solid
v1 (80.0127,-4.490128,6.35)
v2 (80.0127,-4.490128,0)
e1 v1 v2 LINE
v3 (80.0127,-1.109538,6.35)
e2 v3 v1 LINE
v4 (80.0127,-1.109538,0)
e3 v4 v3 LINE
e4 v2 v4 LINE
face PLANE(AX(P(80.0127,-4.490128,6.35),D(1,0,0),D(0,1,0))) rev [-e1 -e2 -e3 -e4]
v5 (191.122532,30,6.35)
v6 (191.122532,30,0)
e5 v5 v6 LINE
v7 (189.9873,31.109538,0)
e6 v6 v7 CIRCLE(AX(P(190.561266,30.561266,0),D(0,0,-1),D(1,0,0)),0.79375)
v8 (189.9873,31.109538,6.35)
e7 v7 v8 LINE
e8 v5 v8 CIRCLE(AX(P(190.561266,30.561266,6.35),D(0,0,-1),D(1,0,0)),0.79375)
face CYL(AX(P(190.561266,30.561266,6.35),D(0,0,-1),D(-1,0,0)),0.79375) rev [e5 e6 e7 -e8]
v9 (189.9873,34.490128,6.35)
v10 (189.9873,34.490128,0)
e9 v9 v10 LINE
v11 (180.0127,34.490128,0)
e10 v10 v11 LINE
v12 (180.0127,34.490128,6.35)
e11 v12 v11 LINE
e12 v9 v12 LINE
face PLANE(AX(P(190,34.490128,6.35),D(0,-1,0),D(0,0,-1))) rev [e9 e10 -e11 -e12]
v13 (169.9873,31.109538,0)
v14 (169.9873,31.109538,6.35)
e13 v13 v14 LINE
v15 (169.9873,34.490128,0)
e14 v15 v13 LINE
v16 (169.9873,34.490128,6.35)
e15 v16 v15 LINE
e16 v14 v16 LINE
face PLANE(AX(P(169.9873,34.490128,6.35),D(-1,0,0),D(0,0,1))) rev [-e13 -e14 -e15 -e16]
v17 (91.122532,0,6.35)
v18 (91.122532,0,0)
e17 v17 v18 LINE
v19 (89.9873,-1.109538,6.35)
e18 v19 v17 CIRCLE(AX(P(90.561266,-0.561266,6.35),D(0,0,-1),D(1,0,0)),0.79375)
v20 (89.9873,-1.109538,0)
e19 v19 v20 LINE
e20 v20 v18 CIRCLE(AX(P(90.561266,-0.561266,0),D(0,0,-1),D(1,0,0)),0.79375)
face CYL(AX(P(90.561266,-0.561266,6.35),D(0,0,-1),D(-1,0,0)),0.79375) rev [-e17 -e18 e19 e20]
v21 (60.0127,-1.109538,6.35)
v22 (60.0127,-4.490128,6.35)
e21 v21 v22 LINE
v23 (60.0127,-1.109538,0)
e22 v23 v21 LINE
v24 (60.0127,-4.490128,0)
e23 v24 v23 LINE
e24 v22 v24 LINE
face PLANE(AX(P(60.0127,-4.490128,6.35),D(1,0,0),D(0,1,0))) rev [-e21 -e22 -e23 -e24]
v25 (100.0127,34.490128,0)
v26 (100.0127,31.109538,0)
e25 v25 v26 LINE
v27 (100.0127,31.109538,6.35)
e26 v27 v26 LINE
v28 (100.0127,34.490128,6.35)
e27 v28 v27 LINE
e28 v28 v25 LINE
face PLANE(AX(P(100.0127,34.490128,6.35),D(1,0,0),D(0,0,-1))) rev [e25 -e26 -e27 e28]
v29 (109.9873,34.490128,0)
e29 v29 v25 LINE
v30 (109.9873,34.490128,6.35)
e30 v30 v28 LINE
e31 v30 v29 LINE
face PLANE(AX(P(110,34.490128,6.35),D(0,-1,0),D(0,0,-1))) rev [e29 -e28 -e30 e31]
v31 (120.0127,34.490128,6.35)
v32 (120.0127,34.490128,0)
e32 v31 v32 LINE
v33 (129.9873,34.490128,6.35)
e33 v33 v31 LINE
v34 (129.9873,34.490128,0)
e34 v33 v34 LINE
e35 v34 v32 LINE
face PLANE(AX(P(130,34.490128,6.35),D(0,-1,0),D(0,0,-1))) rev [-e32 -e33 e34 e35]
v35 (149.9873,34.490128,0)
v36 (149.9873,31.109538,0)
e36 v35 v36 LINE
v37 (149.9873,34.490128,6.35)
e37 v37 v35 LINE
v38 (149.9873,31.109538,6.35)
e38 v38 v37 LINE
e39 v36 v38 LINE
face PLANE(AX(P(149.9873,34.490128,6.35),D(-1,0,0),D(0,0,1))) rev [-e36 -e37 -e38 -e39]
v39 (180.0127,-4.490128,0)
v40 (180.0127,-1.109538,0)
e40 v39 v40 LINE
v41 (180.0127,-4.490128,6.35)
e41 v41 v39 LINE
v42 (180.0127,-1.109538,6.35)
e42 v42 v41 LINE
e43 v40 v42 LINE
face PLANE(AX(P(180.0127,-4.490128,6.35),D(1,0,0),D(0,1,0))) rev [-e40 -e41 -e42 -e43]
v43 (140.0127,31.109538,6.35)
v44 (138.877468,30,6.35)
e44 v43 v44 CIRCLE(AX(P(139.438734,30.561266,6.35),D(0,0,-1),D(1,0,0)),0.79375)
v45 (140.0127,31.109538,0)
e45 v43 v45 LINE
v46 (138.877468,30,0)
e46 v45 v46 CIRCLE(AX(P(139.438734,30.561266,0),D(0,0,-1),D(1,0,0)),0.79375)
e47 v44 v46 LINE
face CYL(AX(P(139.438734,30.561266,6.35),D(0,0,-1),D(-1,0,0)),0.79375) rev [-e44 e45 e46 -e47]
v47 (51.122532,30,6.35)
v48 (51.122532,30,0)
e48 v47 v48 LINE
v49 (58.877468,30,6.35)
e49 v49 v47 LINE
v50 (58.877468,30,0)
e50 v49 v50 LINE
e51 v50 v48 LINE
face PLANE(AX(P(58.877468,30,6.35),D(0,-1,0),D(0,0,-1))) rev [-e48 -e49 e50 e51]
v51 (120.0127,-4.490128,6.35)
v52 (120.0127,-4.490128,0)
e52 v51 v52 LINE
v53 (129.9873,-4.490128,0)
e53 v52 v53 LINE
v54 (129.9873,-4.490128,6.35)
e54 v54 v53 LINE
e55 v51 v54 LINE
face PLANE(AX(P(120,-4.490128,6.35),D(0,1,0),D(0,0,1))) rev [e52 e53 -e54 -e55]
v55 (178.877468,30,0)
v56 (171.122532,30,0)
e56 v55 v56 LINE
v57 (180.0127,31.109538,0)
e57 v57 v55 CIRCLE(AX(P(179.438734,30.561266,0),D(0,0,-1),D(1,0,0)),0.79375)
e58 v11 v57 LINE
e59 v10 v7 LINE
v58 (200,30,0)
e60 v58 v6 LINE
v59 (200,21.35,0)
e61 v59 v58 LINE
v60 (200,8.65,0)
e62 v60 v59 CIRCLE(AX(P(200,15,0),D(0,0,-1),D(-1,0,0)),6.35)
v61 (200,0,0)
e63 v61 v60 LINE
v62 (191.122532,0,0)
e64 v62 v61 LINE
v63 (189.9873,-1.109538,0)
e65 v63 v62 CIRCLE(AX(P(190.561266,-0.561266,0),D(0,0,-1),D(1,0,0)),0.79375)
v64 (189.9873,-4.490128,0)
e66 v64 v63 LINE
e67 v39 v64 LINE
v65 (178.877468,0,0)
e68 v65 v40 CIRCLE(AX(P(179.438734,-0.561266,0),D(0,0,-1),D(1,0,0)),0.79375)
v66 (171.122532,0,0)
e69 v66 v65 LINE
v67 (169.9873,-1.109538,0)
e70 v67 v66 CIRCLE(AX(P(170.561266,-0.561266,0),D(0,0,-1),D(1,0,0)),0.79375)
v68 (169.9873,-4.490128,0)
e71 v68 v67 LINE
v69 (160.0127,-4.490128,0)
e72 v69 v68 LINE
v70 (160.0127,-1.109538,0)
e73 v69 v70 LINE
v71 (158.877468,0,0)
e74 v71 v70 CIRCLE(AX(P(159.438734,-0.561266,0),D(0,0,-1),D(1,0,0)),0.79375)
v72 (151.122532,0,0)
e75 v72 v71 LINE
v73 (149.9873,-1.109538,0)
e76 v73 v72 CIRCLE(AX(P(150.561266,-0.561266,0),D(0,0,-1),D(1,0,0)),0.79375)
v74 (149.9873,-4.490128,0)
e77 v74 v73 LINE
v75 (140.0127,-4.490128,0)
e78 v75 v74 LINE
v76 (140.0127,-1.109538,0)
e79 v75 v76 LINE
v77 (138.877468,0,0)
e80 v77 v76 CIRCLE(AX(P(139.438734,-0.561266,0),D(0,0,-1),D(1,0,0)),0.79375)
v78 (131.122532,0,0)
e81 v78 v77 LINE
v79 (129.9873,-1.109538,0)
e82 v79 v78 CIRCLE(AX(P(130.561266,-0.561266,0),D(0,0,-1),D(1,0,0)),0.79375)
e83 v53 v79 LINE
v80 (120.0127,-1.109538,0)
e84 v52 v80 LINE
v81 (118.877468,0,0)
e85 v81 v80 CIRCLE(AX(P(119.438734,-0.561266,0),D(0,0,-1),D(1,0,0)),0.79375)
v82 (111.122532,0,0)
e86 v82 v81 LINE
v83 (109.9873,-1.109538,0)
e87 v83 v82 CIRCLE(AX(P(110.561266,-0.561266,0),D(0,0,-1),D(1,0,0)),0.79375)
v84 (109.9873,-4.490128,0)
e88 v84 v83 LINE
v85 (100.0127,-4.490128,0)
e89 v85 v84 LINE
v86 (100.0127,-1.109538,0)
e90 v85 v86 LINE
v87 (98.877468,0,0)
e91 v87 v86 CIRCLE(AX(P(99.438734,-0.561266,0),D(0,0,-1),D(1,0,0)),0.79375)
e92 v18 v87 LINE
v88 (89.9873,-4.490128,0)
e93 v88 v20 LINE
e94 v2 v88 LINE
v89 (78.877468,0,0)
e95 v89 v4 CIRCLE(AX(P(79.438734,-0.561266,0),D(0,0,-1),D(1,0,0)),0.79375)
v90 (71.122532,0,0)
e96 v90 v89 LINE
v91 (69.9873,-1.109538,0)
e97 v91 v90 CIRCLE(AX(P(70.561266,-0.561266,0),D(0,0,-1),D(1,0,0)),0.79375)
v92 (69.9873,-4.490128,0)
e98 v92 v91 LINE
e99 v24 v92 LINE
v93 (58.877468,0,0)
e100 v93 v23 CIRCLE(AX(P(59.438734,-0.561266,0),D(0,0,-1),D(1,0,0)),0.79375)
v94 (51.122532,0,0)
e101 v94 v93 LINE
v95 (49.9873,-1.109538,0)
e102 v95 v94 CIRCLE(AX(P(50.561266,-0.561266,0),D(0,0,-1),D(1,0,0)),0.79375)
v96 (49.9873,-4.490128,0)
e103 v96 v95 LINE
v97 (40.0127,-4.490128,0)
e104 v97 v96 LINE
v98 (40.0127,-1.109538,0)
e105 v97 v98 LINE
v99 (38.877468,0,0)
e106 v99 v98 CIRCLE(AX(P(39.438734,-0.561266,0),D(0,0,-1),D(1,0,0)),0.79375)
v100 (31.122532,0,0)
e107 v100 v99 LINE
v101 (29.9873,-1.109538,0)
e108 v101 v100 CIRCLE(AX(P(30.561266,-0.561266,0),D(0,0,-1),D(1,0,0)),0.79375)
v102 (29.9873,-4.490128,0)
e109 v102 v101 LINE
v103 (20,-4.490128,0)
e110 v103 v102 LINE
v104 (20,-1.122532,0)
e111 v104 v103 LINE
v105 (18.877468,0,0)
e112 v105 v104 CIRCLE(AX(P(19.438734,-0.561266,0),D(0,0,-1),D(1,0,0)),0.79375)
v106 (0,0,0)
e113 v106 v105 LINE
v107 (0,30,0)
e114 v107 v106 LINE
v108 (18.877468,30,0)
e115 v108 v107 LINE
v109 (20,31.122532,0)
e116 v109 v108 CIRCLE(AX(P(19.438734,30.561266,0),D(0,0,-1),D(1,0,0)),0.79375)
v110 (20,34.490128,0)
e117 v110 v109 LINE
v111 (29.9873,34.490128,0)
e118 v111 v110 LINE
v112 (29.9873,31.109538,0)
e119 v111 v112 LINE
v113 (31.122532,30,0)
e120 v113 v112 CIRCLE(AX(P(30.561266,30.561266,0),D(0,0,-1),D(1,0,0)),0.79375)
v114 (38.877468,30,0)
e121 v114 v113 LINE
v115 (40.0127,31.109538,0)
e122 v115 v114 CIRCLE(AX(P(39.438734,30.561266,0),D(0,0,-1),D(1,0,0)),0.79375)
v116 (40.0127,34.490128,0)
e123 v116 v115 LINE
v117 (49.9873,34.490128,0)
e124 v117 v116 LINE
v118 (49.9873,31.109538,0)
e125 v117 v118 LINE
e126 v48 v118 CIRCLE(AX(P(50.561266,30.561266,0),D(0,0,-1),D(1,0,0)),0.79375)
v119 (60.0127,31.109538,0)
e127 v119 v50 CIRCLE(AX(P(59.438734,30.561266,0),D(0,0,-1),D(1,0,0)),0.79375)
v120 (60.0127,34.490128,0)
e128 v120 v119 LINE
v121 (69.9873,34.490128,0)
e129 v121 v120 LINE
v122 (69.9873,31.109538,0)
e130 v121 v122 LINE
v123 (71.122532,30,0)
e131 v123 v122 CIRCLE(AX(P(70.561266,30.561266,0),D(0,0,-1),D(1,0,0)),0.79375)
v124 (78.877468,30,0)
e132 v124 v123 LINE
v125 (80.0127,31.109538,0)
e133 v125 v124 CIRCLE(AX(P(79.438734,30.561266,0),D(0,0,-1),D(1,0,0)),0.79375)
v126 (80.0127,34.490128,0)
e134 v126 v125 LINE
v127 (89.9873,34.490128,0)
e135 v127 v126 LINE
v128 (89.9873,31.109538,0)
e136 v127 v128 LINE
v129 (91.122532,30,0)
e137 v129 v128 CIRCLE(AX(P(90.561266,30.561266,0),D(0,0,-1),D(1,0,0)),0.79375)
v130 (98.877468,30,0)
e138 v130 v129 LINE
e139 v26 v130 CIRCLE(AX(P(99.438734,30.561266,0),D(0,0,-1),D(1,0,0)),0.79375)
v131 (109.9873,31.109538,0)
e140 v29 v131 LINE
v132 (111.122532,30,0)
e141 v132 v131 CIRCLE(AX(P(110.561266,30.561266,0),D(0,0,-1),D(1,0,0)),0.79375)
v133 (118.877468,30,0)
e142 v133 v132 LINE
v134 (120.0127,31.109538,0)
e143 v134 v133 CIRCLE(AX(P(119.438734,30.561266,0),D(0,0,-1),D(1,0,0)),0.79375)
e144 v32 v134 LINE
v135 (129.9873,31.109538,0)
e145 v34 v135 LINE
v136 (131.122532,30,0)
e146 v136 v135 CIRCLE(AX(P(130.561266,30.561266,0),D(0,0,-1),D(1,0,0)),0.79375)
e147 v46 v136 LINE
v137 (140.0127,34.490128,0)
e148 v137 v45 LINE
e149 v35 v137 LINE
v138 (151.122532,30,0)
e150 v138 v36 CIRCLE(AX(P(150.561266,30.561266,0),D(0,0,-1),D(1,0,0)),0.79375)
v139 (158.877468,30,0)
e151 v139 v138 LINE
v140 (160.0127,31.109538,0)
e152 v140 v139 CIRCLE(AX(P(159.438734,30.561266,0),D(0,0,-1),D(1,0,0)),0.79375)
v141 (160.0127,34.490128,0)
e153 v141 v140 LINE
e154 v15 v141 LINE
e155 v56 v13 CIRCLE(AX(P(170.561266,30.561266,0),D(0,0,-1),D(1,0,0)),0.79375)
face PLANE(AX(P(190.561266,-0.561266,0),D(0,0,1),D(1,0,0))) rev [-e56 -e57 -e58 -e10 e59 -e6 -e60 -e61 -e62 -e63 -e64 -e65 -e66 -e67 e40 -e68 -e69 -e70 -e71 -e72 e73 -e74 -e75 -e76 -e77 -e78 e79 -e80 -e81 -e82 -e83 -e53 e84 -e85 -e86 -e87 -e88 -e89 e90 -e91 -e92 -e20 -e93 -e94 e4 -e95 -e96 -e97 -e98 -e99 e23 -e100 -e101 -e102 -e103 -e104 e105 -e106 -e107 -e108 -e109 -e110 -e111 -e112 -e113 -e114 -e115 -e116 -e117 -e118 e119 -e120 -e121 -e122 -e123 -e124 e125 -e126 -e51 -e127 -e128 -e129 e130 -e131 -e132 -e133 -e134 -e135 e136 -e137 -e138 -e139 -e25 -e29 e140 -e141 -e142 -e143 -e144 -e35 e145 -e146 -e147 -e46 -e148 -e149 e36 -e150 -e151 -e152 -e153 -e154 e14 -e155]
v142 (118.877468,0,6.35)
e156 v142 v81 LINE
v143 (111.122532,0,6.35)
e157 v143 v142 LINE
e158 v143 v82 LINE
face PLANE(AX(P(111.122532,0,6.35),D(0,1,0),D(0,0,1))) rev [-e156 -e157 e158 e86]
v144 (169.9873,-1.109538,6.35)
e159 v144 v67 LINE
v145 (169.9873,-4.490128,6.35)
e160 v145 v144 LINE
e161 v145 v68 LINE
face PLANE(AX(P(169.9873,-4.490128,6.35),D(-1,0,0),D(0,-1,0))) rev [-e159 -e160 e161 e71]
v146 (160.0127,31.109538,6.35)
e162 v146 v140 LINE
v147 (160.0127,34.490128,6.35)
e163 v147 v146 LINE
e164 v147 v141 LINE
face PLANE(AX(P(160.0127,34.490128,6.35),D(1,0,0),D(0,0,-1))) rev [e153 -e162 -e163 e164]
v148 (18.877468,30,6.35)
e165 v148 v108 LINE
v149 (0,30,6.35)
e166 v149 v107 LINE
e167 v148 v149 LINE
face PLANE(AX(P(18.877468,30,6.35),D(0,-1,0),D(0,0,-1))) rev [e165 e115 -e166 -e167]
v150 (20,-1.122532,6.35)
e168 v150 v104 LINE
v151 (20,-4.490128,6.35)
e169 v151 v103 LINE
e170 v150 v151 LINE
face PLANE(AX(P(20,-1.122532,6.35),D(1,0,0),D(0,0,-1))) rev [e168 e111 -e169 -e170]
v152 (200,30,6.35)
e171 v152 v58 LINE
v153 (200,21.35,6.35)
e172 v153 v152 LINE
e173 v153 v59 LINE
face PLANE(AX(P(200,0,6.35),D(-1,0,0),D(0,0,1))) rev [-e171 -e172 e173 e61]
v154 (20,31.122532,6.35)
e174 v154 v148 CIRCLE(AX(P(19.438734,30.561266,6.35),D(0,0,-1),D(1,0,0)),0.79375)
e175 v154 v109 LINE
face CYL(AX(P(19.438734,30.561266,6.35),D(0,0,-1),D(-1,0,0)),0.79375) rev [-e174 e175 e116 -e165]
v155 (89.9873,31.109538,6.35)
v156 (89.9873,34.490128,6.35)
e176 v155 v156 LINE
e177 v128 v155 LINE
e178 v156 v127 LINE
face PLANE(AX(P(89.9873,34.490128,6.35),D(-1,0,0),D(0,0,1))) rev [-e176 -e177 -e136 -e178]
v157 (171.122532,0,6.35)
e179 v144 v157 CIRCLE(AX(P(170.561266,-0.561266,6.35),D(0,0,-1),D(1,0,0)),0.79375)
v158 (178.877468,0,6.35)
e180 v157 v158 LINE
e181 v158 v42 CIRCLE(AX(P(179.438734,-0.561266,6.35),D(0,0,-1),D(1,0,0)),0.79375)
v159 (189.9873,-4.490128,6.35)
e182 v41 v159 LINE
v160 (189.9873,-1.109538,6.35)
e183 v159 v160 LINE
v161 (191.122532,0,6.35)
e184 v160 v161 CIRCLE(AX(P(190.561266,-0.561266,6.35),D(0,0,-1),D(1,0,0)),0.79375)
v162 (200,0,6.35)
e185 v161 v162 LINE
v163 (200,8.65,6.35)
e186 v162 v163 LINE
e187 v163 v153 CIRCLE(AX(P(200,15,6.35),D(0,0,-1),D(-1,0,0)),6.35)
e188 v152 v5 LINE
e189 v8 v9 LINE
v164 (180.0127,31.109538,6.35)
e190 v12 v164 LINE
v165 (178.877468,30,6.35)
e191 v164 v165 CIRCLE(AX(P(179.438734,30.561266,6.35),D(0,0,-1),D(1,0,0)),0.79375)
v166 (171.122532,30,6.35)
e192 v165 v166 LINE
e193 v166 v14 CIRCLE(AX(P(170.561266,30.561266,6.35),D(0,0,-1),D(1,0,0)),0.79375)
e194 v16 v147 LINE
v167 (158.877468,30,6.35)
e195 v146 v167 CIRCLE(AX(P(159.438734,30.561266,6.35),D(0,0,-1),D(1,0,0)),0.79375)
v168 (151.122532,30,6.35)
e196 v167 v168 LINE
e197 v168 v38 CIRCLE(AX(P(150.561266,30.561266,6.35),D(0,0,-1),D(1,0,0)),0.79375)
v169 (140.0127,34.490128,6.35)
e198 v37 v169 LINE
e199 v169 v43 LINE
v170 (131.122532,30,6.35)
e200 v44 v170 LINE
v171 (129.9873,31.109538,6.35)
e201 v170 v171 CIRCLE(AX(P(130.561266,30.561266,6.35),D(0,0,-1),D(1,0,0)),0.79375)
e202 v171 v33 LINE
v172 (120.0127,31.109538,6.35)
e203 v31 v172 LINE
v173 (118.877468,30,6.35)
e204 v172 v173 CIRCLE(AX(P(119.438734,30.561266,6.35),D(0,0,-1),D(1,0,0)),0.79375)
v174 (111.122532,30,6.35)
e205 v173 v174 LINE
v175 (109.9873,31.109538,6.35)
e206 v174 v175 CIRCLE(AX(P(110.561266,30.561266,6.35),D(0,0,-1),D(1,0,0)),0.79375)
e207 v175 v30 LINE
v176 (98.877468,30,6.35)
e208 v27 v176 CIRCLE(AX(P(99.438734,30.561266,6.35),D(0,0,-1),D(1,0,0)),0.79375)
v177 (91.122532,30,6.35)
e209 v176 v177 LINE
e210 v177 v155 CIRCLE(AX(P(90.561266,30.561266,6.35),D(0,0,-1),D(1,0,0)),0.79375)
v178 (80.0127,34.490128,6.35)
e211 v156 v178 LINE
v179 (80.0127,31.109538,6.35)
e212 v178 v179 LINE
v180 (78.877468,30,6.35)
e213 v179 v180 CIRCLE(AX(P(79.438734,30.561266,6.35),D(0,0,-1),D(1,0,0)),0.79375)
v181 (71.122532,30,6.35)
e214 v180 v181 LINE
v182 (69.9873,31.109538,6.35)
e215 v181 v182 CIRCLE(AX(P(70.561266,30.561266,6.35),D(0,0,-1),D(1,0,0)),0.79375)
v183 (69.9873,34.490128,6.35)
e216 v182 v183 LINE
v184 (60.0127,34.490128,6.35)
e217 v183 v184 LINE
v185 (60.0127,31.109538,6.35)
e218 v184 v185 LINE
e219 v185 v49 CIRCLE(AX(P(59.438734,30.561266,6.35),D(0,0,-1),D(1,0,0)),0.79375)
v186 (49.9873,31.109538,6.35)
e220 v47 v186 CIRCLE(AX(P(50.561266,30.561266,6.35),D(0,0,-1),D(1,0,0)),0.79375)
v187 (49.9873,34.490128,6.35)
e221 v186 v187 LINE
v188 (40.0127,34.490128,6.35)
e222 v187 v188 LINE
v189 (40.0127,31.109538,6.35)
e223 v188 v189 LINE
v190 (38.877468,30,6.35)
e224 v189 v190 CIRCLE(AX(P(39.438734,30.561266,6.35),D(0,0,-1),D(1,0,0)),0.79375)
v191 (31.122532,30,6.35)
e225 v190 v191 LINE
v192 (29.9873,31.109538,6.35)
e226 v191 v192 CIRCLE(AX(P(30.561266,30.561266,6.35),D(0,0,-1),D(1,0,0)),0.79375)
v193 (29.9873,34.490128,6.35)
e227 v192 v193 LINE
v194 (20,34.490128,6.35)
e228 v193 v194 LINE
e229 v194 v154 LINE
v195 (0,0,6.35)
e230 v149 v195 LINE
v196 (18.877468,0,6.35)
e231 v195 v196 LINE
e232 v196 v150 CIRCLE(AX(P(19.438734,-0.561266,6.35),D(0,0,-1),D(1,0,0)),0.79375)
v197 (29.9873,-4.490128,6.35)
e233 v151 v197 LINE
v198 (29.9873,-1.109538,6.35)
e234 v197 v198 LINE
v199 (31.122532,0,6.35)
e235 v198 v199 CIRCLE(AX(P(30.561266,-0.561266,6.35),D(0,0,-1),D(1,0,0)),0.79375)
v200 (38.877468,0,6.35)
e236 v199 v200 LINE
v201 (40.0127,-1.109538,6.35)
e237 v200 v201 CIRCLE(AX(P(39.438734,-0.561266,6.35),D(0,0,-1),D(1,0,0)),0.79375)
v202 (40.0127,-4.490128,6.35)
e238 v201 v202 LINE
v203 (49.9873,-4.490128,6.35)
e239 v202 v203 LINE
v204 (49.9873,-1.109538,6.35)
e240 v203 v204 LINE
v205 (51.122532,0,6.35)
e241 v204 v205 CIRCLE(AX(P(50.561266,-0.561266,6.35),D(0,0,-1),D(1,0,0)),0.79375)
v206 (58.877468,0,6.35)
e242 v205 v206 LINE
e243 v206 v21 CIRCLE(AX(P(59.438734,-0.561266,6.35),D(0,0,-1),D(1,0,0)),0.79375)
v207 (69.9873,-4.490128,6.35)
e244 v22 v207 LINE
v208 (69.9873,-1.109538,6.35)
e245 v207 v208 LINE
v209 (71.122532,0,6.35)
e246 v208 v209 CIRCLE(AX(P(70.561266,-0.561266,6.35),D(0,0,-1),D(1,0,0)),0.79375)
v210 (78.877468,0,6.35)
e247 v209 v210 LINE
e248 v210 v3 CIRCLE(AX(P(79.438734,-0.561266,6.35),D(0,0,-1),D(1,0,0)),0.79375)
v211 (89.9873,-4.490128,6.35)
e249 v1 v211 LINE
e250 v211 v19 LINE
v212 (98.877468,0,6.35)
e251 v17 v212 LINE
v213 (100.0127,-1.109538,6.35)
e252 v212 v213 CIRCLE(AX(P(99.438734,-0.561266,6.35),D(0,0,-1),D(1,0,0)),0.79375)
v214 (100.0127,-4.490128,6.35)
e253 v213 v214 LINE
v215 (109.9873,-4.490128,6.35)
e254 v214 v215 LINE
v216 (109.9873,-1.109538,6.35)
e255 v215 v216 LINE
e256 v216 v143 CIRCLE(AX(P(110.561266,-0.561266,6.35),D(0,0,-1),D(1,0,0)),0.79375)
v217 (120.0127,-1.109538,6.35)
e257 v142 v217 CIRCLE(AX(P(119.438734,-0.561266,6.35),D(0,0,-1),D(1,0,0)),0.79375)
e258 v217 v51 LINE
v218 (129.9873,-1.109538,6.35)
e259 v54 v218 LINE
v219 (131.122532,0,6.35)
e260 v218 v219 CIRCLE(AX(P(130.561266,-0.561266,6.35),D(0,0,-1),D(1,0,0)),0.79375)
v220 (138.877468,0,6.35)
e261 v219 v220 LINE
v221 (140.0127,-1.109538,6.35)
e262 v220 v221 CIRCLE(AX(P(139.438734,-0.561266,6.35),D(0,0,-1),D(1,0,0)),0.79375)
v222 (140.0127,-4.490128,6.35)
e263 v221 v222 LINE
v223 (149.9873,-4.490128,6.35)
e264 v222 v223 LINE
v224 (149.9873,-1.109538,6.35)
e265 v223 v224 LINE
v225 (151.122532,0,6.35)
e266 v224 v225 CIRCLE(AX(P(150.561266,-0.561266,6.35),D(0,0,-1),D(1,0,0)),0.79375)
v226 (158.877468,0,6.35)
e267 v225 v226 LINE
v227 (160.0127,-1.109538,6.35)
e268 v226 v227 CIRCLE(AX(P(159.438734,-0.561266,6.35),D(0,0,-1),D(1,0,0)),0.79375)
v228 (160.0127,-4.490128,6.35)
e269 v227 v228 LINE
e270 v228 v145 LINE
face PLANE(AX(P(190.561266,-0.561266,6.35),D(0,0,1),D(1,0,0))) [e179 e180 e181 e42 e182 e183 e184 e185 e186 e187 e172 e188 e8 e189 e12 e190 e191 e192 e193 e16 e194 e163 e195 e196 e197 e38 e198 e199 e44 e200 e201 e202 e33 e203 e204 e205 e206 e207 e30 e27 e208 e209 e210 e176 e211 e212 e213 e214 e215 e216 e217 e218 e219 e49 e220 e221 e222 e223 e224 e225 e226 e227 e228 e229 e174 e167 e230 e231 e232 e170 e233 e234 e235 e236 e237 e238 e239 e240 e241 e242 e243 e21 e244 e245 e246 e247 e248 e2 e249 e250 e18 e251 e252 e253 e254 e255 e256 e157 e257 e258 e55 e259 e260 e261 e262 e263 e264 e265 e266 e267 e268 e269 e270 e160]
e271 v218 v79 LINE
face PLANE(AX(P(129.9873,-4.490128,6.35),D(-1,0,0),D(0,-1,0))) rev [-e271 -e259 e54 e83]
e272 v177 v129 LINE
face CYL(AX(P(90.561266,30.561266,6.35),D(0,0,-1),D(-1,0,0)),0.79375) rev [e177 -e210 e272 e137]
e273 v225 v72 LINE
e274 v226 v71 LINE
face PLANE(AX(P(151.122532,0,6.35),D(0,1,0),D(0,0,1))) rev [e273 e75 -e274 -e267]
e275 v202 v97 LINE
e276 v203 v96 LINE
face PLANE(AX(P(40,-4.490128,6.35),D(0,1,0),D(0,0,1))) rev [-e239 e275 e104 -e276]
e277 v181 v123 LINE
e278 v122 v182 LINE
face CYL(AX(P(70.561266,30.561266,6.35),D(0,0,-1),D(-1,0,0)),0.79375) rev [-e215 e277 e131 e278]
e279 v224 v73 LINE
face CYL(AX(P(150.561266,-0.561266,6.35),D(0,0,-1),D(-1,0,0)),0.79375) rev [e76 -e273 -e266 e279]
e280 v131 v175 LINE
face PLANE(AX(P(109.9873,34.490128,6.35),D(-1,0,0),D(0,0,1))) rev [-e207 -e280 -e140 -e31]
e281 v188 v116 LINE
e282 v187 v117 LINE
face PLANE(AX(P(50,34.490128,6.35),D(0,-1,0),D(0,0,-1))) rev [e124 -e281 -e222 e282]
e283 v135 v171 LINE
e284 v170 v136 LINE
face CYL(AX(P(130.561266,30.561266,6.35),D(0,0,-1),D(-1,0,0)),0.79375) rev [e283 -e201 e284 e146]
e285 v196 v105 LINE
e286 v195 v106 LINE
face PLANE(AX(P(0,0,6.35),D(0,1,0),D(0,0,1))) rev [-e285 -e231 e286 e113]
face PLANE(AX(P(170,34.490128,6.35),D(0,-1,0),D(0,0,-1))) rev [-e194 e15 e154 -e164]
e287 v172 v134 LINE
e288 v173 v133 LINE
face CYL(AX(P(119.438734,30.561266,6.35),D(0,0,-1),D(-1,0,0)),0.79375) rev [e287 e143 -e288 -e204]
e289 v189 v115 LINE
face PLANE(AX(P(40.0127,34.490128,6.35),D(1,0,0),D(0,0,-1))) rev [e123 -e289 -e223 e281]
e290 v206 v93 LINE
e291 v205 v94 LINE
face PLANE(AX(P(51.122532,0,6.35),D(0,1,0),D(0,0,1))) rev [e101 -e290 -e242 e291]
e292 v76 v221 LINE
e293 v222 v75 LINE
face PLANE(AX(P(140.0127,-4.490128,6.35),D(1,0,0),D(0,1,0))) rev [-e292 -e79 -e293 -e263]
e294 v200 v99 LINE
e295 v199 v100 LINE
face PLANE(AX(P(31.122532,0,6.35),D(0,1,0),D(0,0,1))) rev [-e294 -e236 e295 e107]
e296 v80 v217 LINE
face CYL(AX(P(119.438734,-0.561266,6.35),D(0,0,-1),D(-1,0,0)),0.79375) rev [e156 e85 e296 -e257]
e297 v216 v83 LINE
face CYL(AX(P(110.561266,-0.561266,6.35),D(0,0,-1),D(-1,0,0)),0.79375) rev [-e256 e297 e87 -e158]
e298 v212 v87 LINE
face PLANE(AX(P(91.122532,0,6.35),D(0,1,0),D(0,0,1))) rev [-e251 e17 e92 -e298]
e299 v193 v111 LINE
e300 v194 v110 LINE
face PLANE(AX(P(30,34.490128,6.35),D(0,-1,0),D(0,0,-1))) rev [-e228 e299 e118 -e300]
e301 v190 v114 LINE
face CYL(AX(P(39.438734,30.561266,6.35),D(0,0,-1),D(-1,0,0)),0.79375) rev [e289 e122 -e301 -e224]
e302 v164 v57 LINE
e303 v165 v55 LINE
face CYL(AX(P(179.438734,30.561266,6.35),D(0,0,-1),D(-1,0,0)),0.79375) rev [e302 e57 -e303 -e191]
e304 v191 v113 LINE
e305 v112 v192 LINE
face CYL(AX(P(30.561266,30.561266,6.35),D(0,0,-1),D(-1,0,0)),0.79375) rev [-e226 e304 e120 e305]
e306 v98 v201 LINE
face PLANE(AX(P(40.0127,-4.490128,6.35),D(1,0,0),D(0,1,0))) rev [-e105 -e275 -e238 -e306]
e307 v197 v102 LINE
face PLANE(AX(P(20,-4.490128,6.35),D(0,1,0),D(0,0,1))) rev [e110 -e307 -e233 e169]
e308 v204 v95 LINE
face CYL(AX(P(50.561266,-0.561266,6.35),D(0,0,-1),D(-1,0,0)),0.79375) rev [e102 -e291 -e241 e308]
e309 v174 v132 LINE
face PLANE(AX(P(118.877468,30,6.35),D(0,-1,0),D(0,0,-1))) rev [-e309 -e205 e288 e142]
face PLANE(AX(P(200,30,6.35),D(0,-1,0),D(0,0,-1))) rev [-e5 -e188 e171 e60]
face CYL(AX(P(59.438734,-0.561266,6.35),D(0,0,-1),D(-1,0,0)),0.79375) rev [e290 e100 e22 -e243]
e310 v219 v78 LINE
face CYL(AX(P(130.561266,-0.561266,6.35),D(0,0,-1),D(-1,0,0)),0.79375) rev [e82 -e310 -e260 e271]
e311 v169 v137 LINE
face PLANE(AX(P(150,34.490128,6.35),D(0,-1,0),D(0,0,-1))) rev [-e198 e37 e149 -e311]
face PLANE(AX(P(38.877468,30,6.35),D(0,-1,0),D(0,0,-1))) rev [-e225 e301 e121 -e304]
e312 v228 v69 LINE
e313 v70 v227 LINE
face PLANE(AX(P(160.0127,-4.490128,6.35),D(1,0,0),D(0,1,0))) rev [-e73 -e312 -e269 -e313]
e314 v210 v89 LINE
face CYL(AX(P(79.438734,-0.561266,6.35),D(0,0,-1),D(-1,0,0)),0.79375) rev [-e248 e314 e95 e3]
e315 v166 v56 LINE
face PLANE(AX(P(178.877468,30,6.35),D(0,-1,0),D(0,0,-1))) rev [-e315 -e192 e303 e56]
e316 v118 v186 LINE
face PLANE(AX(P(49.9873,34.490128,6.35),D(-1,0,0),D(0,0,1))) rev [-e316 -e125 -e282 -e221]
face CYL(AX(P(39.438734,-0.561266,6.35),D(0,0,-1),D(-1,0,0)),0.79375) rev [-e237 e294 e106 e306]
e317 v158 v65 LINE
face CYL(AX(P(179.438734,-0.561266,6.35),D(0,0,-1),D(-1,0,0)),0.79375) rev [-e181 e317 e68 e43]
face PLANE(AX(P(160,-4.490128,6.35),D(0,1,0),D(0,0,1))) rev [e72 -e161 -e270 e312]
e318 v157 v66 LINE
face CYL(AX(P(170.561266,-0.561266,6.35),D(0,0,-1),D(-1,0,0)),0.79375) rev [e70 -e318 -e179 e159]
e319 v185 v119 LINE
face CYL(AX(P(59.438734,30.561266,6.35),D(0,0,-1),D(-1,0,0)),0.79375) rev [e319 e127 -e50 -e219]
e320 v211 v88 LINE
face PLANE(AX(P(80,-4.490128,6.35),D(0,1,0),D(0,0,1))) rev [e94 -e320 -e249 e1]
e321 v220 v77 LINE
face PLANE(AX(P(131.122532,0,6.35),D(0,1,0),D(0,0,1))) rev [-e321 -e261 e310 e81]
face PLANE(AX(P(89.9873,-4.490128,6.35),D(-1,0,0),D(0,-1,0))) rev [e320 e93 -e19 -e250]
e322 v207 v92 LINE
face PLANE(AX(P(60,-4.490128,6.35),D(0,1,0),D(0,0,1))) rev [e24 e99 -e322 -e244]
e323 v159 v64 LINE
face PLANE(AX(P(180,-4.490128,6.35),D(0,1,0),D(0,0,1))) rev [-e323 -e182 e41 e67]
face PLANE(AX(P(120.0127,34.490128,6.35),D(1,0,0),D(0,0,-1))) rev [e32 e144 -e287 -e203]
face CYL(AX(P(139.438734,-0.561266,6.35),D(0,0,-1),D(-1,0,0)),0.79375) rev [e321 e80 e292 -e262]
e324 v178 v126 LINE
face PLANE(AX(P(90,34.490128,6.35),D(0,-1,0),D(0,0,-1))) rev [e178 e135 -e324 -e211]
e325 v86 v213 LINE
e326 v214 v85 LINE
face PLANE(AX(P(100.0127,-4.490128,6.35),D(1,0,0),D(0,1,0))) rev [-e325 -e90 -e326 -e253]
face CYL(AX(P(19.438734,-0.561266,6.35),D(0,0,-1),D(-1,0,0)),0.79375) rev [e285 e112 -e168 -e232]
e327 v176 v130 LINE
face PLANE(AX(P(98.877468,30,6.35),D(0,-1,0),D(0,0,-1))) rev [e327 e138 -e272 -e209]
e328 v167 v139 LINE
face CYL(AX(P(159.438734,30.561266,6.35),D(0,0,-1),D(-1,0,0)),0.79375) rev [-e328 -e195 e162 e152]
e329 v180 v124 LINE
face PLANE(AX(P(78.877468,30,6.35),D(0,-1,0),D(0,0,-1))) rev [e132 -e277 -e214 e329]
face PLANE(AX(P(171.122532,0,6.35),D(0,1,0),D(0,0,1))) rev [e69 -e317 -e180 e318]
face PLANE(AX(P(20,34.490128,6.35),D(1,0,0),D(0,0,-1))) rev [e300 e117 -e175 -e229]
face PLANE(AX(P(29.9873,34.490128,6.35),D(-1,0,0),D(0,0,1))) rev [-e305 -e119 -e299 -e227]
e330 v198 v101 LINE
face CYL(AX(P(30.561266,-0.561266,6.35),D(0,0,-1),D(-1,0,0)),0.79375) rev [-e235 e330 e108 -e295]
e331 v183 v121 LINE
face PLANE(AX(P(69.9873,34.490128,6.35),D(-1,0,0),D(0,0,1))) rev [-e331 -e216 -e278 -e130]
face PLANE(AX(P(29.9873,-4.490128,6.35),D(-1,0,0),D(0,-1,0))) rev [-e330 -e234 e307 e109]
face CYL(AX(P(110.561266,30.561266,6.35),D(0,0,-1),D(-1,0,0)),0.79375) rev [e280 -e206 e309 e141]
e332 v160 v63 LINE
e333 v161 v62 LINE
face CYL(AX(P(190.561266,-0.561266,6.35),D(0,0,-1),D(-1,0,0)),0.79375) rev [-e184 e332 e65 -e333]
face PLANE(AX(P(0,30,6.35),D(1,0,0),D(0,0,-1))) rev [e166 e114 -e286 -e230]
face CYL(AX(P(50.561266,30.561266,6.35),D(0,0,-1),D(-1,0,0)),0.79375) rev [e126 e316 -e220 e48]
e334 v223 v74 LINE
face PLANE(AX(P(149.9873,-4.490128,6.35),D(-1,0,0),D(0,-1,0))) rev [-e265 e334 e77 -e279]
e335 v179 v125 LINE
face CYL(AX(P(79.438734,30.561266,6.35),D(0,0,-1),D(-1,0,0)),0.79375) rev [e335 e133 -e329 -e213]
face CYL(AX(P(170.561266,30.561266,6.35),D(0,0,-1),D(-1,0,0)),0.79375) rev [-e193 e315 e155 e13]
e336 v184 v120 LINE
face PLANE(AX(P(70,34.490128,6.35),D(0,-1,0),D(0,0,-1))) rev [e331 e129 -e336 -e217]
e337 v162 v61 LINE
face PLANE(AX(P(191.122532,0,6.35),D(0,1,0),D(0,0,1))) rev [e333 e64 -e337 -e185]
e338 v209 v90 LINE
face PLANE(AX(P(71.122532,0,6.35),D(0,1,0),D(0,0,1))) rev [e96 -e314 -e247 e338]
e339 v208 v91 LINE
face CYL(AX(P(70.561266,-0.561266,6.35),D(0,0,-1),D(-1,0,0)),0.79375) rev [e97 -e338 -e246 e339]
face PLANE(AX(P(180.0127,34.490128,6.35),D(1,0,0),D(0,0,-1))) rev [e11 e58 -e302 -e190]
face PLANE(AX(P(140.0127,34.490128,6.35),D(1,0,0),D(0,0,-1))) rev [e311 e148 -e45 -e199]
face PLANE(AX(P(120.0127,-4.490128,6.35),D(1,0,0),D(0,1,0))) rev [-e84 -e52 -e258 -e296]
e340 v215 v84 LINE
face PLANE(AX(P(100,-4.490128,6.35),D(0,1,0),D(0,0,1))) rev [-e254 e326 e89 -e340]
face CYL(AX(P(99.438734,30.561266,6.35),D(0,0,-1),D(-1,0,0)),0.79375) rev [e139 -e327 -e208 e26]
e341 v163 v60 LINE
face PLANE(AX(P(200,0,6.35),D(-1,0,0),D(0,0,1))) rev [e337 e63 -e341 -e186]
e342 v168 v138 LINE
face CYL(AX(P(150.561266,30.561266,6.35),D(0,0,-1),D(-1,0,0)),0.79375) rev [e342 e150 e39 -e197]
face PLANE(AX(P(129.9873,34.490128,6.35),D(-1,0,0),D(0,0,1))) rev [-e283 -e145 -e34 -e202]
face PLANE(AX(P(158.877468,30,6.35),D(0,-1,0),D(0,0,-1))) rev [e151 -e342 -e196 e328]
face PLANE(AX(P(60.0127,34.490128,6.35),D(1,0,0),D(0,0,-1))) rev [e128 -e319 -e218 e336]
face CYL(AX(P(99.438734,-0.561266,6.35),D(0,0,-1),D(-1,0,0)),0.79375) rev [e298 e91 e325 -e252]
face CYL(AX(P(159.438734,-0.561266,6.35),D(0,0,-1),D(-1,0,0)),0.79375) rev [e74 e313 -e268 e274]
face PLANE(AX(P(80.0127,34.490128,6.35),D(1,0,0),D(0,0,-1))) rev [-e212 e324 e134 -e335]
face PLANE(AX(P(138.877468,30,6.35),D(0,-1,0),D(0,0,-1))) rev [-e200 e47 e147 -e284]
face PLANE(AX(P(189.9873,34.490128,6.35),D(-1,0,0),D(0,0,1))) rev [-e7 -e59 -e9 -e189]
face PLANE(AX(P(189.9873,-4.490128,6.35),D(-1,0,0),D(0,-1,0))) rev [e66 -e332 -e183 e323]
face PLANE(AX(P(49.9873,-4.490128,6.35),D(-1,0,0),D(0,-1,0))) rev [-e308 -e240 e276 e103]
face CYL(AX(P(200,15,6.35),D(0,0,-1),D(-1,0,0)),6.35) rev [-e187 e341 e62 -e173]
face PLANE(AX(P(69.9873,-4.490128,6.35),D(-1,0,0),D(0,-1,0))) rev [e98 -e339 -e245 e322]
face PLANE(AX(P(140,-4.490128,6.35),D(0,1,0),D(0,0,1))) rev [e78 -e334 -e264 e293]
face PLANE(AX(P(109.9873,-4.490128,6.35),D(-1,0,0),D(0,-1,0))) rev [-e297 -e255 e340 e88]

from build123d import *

# Parameters (mm, degrees)
BOSS_EXTRUDE1_DEPTH = 6.35
SKETCH2_W           = 10.0254
SKETCH2_H           = 4.477133961
CUT_EXTRUDE2_DEPTH  = 204.051450213
LPATTERN1_COUNT     = 9
LPATTERN1_PITCH     = 20
CUT_EXTRUDE5_DEPTH  = 204.051450213


# Read off the part's stored shape, not the designer's step: Boss-Extrude1
with BuildPart() as part:
    # Boss-Extrude1 outline → Boss-Extrude1 (new body)
    with BuildSketch(Plane.XY):
        with BuildLine():
            Line((190, -4.490128061), (190, -1.122532015))
            ThreePointArc((190, -1.122532015), (190, 0), (191.122532015, 0))
            Line((191.122532015, 0), (200, 0))
            Line((200, 0), (200, 30))
            Line((200, 30), (191.122532015, 30))
            ThreePointArc((191.122532015, 30), (190, 30), (190, 31.122532015))
            Line((190, 31.122532015), (190, 34.490128061))
            Line((190, 34.490128061), (180, 34.490128061))
            Line((180, 34.490128061), (180, 31.122532015))
            ThreePointArc((180, 31.122532015), (180, 30), (178.877467985, 30))
            Line((178.877467985, 30), (171.122532015, 30))
            ThreePointArc((171.122532015, 30), (170, 30), (170, 31.122532015))
            Line((170, 31.122532015), (170, 34.490128061))
            Line((170, 34.490128061), (160, 34.490128061))
            Line((160, 34.490128061), (160, 31.122532015))
            ThreePointArc((160, 31.122532015), (160, 30), (158.877467985, 30))
            Line((158.877467985, 30), (151.122532015, 30))
            ThreePointArc((151.122532015, 30), (150, 30), (150, 31.122532015))
            Line((150, 31.122532015), (150, 34.490128061))
            Line((150, 34.490128061), (140, 34.490128061))
            Line((140, 34.490128061), (140, 31.122532015))
            ThreePointArc((140, 31.122532015), (140, 30), (138.877467985, 30))
            Line((138.877467985, 30), (131.122532015, 30))
            ThreePointArc((131.122532015, 30), (130, 30), (130, 31.122532015))
            Line((130, 31.122532015), (130, 34.490128061))
            Line((130, 34.490128061), (120, 34.490128061))
            Line((120, 34.490128061), (120, 31.122532015))
            ThreePointArc((120, 31.122532015), (120, 30), (118.877467985, 30))
            Line((118.877467985, 30), (111.122532015, 30))
            ThreePointArc((111.122532015, 30), (110, 30), (110, 31.122532015))
            Line((110, 31.122532015), (110, 34.490128061))
            Line((110, 34.490128061), (100, 34.490128061))
            Line((100, 34.490128061), (100, 31.122532015))
            ThreePointArc((100, 31.122532015), (100, 30), (98.877467985, 30))
            Line((98.877467985, 30), (91.122532015, 30))
            ThreePointArc((91.122532015, 30), (90, 30), (90, 31.122532015))
            Line((90, 31.122532015), (90, 34.490128061))
            Line((90, 34.490128061), (80, 34.490128061))
            Line((80, 34.490128061), (80, 31.122532015))
            ThreePointArc((80, 31.122532015), (80, 30), (78.877467985, 30))
            Line((78.877467985, 30), (71.122532015, 30))
            ThreePointArc((71.122532015, 30), (70, 30), (70, 31.122532015))
            Line((70, 31.122532015), (70, 34.490128061))
            Line((70, 34.490128061), (60, 34.490128061))
            Line((60, 34.490128061), (60, 31.122532015))
            ThreePointArc((60, 31.122532015), (60, 30), (58.877467985, 30))
            Line((58.877467985, 30), (51.122532015, 30))
            ThreePointArc((51.122532015, 30), (50, 30), (50, 31.122532015))
            Line((50, 31.122532015), (50, 34.490128061))
            Line((50, 34.490128061), (40, 34.490128061))
            Line((40, 34.490128061), (40, 31.122532015))
            ThreePointArc((40, 31.122532015), (40, 30), (38.877467985, 30))
            Line((38.877467985, 30), (31.122532015, 30))
            ThreePointArc((31.122532015, 30), (30, 30), (30, 31.122532015))
            Line((30, 31.122532015), (30, 34.490128061))
            Line((30, 34.490128061), (20, 34.490128061))
            Line((20, 34.490128061), (20, 31.122532015))
            ThreePointArc((20, 31.122532015), (20, 30), (18.877467985, 30))
            Line((18.877467985, 30), (0, 30))
            Line((0, 30), (0, 0))
            Line((0, 0), (18.877467985, 0))
            ThreePointArc((18.877467985, 0), (20, 0), (20, -1.122532015))
            Line((20, -1.122532015), (20, -4.490128061))
            Line((20, -4.490128061), (30, -4.490128061))
            Line((30, -4.490128061), (30, -1.122532015))
            ThreePointArc((30, -1.122532015), (30, 0), (31.122532015, 0))
            Line((31.122532015, 0), (38.877467985, 0))
            ThreePointArc((38.877467985, 0), (40, 0), (40, -1.122532015))
            Line((40, -1.122532015), (40, -4.490128061))
            Line((40, -4.490128061), (50, -4.490128061))
            Line((50, -4.490128061), (50, -1.122532015))
            ThreePointArc((50, -1.122532015), (50, 0), (51.122532015, 0))
            Line((51.122532015, 0), (58.877467985, 0))
            ThreePointArc((58.877467985, 0), (60, 0), (60, -1.122532015))
            Line((60, -1.122532015), (60, -4.490128061))
            Line((60, -4.490128061), (70, -4.490128061))
            Line((70, -4.490128061), (70, -1.122532015))
            ThreePointArc((70, -1.122532015), (70, 0), (71.122532015, 0))
            Line((71.122532015, 0), (78.877467985, 0))
            ThreePointArc((78.877467985, 0), (80, 0), (80, -1.122532015))
            Line((80, -1.122532015), (80, -4.490128061))
            Line((80, -4.490128061), (90, -4.490128061))
            Line((90, -4.490128061), (90, -1.122532015))
            ThreePointArc((90, -1.122532015), (90, 0), (91.122532015, 0))
            Line((91.122532015, 0), (98.877467985, 0))
            ThreePointArc((98.877467985, 0), (100, 0), (100, -1.122532015))
            Line((100, -1.122532015), (100, -4.490128061))
            Line((100, -4.490128061), (110, -4.490128061))
            Line((110, -4.490128061), (110, -1.122532015))
            ThreePointArc((110, -1.122532015), (110, 0), (111.122532015, 0))
            Line((111.122532015, 0), (118.877467985, 0))
            ThreePointArc((118.877467985, 0), (120, 0), (120, -1.122532015))
            Line((120, -1.122532015), (120, -4.490128061))
            Line((120, -4.490128061), (130, -4.490128061))
            Line((130, -4.490128061), (130, -1.122532015))
            ThreePointArc((130, -1.122532015), (130, 0), (131.122532015, 0))
            Line((131.122532015, 0), (138.877467985, 0))
            ThreePointArc((138.877467985, 0), (140, 0), (140, -1.122532015))
            Line((140, -1.122532015), (140, -4.490128061))
            Line((140, -4.490128061), (150, -4.490128061))
            Line((150, -4.490128061), (150, -1.122532015))
            ThreePointArc((150, -1.122532015), (150, 0), (151.122532015, 0))
            Line((151.122532015, 0), (158.877467985, 0))
            ThreePointArc((158.877467985, 0), (160, 0), (160, -1.122532015))
            Line((160, -1.122532015), (160, -4.490128061))
            Line((160, -4.490128061), (170, -4.490128061))
            Line((170, -4.490128061), (170, -1.122532015))
            ThreePointArc((170, -1.122532015), (170, 0), (171.122532015, 0))
            Line((171.122532015, 0), (178.877467985, 0))
            ThreePointArc((178.877467985, 0), (180, 0), (180, -1.122532015))
            Line((180, -1.122532015), (180, -4.490128061))
            Line((180, -4.490128061), (190, -4.490128061))
        make_face()
    extrude(amount=BOSS_EXTRUDE1_DEPTH)

    # Sketch2 → Cut-Extrude2 (cut, through all)
    with BuildSketch(Plane(origin=(0, 0, 0), x_dir=(-1, 0, 0), z_dir=(0, 0, -1))):
        with Locations((-35, 32.25156108)):
            Rectangle(SKETCH2_W, SKETCH2_H)
        with Locations((-35, -2.251561081)):
            Rectangle(SKETCH2_W, SKETCH2_H)
    cut_extrude2 = extrude(amount=-CUT_EXTRUDE2_DEPTH, mode=Mode.SUBTRACT)

    # LPattern1: Cut-Extrude2 ×9
    with Locations(*[(i * LPATTERN1_PITCH, 0, 0) for i in range(1, LPATTERN1_COUNT)]):
        add(cut_extrude2, mode=Mode.SUBTRACT)

    # Sketch6 → Cut-Extrude5 (cut, through all)
    with BuildSketch(Plane(origin=(0, 0, 0), x_dir=(-1, 0, 0), z_dir=(0, 0, -1))):
        with BuildLine():
            Line((-200, 8.65), (-200, 21.35))
            ThreePointArc((-200, 21.35), (-193.65, 15), (-200, 8.65))
        make_face()
    extrude(amount=-CUT_EXTRUDE5_DEPTH, mode=Mode.SUBTRACT)


solid = part.part
